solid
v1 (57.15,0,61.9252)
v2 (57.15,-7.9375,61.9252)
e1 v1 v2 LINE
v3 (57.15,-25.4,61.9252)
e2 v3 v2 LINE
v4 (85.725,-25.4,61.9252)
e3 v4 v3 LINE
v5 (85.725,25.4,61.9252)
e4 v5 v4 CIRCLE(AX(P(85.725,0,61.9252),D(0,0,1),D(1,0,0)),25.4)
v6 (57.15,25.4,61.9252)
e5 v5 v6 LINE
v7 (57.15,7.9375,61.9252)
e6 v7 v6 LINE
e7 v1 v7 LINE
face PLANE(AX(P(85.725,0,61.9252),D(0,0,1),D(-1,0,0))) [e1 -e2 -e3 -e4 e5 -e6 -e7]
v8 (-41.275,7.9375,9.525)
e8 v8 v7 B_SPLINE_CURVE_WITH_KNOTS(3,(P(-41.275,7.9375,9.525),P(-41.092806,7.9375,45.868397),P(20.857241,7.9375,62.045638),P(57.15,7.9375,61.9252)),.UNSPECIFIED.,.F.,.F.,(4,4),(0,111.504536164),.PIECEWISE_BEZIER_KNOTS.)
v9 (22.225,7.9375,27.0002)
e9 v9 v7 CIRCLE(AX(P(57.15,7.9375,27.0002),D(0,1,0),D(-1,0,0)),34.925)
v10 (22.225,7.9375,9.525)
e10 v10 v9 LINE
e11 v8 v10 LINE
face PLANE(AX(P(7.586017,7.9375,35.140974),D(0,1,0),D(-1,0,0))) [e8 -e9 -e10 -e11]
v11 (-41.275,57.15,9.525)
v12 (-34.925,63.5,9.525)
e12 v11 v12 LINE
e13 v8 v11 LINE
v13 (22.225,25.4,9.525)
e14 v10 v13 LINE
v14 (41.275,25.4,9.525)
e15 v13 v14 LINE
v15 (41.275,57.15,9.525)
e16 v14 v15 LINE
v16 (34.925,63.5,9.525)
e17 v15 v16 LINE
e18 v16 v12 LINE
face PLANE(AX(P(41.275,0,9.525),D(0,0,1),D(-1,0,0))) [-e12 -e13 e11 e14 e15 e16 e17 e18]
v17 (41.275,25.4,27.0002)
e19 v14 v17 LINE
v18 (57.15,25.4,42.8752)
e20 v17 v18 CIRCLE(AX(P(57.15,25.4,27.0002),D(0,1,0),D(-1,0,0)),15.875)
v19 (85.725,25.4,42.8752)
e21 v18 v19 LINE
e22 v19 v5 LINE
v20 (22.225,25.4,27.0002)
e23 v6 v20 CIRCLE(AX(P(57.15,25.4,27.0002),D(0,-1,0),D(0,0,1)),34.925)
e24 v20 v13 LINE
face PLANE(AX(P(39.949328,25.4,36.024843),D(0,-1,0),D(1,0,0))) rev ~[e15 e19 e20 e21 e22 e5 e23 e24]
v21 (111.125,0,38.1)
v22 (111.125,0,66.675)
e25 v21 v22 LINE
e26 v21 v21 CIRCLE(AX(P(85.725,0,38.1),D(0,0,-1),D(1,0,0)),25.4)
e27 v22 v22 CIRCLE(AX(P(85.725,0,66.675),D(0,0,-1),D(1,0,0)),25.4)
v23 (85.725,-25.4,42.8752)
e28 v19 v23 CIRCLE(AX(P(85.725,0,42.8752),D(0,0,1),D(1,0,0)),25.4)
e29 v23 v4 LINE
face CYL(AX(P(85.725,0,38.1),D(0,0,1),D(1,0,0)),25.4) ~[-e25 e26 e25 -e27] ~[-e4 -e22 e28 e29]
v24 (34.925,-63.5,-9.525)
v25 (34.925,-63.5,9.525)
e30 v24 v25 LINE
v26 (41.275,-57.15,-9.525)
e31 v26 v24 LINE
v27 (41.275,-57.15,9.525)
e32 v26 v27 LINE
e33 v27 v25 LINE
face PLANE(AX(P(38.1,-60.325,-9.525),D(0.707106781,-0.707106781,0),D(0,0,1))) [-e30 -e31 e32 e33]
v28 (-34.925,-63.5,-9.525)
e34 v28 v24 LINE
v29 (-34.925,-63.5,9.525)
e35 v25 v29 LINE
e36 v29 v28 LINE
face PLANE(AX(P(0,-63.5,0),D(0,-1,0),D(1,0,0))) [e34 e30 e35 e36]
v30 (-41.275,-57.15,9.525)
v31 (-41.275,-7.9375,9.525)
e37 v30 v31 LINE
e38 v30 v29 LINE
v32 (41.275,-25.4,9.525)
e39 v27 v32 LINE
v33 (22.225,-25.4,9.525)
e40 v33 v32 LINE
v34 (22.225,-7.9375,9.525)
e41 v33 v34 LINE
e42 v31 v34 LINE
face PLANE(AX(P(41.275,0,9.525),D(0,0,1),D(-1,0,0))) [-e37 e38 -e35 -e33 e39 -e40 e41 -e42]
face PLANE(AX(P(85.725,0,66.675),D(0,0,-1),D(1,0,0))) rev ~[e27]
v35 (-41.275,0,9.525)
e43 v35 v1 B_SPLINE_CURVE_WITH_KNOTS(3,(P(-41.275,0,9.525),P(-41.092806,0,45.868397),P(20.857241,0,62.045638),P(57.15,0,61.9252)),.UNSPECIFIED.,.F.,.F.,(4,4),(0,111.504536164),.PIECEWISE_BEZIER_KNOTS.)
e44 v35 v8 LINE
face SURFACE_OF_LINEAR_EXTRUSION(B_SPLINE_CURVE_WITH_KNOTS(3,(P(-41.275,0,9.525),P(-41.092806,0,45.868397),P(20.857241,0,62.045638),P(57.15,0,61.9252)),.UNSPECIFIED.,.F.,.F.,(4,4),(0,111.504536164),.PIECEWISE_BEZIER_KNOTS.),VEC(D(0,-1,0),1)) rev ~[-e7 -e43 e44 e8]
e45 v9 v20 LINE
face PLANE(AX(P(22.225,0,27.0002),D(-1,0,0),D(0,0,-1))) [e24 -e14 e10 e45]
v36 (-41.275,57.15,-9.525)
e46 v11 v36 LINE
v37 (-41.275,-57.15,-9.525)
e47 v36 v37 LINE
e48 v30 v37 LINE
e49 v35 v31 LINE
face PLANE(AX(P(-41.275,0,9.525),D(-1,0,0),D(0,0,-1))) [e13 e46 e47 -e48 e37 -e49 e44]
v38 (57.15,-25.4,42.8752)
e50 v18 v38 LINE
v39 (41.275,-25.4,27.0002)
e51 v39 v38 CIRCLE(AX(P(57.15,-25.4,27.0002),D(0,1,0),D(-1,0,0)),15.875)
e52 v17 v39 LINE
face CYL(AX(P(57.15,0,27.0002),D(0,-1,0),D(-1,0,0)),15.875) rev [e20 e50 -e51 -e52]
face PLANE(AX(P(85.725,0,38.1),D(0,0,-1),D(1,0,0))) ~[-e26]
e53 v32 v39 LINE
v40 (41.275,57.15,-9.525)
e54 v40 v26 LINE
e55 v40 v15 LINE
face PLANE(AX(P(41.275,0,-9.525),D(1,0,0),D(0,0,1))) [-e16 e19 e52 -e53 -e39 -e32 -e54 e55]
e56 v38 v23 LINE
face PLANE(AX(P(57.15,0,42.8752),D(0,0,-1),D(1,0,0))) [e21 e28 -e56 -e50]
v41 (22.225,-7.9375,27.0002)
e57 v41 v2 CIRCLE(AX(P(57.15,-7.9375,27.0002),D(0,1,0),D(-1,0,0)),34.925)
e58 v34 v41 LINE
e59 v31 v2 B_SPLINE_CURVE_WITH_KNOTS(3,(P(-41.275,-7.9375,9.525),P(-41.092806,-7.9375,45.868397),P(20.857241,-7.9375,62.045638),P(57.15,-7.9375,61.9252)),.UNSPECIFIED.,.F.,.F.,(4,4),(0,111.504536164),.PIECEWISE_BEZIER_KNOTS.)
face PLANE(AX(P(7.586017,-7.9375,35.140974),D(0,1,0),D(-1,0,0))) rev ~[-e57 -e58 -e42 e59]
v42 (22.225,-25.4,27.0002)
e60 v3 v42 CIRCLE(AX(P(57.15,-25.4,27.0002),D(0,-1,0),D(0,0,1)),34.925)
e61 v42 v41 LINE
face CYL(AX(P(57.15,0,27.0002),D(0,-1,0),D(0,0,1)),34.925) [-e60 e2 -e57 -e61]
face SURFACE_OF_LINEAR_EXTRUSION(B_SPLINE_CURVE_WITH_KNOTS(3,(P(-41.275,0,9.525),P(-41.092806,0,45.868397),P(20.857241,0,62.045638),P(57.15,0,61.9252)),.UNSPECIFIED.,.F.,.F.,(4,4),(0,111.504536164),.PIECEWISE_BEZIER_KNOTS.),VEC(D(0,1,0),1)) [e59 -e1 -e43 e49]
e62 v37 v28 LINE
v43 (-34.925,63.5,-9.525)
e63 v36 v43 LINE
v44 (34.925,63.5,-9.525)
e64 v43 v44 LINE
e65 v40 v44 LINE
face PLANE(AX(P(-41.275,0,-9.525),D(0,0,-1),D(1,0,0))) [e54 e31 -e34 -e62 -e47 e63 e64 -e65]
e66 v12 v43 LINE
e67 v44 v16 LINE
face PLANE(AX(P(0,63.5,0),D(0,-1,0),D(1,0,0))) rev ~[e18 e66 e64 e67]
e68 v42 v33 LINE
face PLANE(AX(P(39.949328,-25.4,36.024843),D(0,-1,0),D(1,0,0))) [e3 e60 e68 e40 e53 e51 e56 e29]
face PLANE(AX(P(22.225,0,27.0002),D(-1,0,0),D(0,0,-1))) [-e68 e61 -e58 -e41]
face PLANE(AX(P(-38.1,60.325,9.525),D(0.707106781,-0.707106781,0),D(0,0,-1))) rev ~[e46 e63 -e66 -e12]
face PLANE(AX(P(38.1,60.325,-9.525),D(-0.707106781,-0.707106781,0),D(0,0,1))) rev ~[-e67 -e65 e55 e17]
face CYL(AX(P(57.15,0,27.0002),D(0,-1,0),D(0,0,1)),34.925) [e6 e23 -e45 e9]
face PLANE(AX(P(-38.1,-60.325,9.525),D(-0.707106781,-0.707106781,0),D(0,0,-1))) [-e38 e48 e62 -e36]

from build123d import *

# Parameters (mm, degrees)
F1_DEPTH = 63.5
F0_W     = 25.4
F0_H     = 19.05
F2_DEPTH = 25.4
F3_DEPTH = 7.9375
F5_SIZE  = 6.35


# Not quite as in the source:
# - a feature names something its author has since deleted; it is built from what else it names


with BuildPart() as f1:
    # F0 (on Front) → F1 (new body, symmetric)
    with BuildSketch(Plane.XZ):
        Polygon((-41.275, 9.525), (-41.275, -9.525), (41.275, -9.525), (41.275, 9.525), (22.225, 9.525), align=None)
    extrude(amount=F1_DEPTH, both=True)

    # F0 (on Front) → F2 (join, symmetric)
    with BuildSketch(Plane.XZ):
        with BuildLine():
            Line((22.225, 9.525), (41.275, 9.525))
            Line((41.275, 9.525), (41.275, 27.0002))
            ThreePointArc((41.275, 27.0002), (45.9246798487, 38.2255201513), (57.15, 42.8752))
            Line((57.15, 42.8752), (60.325, 42.8752))
            Line((60.325, 42.8752), (60.325, 61.9252))
            Line((60.325, 61.9252), (57.15, 61.9252))
            ThreePointArc((57.15, 61.9252), (32.4542956671, 51.6959043329), (22.225, 27.0002))
            Line((22.225, 27.0002), (22.225, 9.525))
        make_face()
        with Locations((73.025, 52.4002)):
            Rectangle(F0_W, F0_H)
    extrude(amount=F2_DEPTH, both=True)

    # F0 (on Front) → F3 (join, symmetric)
    with BuildSketch(Plane.XZ):
        with BuildLine():
            add(Edge.make_bspline(
                [(-41.275, 9.525), (-41.0928055644, 45.868396759), (20.8572410047, 62.0456375182), (57.15, 61.9252)],
                knots=[0, 0, 0, 0, 111.5045361635, 111.5045361635, 111.5045361635, 111.5045361635], degree=3))
            Line((-41.275, 9.525), (22.225, 9.525))
            Line((22.225, 9.525), (22.225, 27.0002))
            ThreePointArc((22.225, 27.0002), (32.4542956671, 51.6959043329), (57.15, 61.9252))
        make_face()
    extrude(amount=F3_DEPTH, both=True)

    # F0 (on Front) → F4 (revolve)
    with BuildSketch(Plane.XZ):
        Polygon((85.725, 66.675), (85.725, 61.9252), (85.725, 42.8752), (85.725, 38.1), (111.125, 38.1), (111.125, 66.675), align=None)
    revolve(axis=Axis((85.725, 0, 52.3875), (0, 0, -1)))

    # F5
    f5_edges = [f1.edges().sort_by_distance(p)[0] for p in [
        (41.275, -63.5, 0),
        (-41.275, -63.5, 0),
        (41.275, 63.5, 0),
        (-41.275, 63.5, 0),
    ]]
    chamfer(f5_edges, length=F5_SIZE)


solid = f1.part
